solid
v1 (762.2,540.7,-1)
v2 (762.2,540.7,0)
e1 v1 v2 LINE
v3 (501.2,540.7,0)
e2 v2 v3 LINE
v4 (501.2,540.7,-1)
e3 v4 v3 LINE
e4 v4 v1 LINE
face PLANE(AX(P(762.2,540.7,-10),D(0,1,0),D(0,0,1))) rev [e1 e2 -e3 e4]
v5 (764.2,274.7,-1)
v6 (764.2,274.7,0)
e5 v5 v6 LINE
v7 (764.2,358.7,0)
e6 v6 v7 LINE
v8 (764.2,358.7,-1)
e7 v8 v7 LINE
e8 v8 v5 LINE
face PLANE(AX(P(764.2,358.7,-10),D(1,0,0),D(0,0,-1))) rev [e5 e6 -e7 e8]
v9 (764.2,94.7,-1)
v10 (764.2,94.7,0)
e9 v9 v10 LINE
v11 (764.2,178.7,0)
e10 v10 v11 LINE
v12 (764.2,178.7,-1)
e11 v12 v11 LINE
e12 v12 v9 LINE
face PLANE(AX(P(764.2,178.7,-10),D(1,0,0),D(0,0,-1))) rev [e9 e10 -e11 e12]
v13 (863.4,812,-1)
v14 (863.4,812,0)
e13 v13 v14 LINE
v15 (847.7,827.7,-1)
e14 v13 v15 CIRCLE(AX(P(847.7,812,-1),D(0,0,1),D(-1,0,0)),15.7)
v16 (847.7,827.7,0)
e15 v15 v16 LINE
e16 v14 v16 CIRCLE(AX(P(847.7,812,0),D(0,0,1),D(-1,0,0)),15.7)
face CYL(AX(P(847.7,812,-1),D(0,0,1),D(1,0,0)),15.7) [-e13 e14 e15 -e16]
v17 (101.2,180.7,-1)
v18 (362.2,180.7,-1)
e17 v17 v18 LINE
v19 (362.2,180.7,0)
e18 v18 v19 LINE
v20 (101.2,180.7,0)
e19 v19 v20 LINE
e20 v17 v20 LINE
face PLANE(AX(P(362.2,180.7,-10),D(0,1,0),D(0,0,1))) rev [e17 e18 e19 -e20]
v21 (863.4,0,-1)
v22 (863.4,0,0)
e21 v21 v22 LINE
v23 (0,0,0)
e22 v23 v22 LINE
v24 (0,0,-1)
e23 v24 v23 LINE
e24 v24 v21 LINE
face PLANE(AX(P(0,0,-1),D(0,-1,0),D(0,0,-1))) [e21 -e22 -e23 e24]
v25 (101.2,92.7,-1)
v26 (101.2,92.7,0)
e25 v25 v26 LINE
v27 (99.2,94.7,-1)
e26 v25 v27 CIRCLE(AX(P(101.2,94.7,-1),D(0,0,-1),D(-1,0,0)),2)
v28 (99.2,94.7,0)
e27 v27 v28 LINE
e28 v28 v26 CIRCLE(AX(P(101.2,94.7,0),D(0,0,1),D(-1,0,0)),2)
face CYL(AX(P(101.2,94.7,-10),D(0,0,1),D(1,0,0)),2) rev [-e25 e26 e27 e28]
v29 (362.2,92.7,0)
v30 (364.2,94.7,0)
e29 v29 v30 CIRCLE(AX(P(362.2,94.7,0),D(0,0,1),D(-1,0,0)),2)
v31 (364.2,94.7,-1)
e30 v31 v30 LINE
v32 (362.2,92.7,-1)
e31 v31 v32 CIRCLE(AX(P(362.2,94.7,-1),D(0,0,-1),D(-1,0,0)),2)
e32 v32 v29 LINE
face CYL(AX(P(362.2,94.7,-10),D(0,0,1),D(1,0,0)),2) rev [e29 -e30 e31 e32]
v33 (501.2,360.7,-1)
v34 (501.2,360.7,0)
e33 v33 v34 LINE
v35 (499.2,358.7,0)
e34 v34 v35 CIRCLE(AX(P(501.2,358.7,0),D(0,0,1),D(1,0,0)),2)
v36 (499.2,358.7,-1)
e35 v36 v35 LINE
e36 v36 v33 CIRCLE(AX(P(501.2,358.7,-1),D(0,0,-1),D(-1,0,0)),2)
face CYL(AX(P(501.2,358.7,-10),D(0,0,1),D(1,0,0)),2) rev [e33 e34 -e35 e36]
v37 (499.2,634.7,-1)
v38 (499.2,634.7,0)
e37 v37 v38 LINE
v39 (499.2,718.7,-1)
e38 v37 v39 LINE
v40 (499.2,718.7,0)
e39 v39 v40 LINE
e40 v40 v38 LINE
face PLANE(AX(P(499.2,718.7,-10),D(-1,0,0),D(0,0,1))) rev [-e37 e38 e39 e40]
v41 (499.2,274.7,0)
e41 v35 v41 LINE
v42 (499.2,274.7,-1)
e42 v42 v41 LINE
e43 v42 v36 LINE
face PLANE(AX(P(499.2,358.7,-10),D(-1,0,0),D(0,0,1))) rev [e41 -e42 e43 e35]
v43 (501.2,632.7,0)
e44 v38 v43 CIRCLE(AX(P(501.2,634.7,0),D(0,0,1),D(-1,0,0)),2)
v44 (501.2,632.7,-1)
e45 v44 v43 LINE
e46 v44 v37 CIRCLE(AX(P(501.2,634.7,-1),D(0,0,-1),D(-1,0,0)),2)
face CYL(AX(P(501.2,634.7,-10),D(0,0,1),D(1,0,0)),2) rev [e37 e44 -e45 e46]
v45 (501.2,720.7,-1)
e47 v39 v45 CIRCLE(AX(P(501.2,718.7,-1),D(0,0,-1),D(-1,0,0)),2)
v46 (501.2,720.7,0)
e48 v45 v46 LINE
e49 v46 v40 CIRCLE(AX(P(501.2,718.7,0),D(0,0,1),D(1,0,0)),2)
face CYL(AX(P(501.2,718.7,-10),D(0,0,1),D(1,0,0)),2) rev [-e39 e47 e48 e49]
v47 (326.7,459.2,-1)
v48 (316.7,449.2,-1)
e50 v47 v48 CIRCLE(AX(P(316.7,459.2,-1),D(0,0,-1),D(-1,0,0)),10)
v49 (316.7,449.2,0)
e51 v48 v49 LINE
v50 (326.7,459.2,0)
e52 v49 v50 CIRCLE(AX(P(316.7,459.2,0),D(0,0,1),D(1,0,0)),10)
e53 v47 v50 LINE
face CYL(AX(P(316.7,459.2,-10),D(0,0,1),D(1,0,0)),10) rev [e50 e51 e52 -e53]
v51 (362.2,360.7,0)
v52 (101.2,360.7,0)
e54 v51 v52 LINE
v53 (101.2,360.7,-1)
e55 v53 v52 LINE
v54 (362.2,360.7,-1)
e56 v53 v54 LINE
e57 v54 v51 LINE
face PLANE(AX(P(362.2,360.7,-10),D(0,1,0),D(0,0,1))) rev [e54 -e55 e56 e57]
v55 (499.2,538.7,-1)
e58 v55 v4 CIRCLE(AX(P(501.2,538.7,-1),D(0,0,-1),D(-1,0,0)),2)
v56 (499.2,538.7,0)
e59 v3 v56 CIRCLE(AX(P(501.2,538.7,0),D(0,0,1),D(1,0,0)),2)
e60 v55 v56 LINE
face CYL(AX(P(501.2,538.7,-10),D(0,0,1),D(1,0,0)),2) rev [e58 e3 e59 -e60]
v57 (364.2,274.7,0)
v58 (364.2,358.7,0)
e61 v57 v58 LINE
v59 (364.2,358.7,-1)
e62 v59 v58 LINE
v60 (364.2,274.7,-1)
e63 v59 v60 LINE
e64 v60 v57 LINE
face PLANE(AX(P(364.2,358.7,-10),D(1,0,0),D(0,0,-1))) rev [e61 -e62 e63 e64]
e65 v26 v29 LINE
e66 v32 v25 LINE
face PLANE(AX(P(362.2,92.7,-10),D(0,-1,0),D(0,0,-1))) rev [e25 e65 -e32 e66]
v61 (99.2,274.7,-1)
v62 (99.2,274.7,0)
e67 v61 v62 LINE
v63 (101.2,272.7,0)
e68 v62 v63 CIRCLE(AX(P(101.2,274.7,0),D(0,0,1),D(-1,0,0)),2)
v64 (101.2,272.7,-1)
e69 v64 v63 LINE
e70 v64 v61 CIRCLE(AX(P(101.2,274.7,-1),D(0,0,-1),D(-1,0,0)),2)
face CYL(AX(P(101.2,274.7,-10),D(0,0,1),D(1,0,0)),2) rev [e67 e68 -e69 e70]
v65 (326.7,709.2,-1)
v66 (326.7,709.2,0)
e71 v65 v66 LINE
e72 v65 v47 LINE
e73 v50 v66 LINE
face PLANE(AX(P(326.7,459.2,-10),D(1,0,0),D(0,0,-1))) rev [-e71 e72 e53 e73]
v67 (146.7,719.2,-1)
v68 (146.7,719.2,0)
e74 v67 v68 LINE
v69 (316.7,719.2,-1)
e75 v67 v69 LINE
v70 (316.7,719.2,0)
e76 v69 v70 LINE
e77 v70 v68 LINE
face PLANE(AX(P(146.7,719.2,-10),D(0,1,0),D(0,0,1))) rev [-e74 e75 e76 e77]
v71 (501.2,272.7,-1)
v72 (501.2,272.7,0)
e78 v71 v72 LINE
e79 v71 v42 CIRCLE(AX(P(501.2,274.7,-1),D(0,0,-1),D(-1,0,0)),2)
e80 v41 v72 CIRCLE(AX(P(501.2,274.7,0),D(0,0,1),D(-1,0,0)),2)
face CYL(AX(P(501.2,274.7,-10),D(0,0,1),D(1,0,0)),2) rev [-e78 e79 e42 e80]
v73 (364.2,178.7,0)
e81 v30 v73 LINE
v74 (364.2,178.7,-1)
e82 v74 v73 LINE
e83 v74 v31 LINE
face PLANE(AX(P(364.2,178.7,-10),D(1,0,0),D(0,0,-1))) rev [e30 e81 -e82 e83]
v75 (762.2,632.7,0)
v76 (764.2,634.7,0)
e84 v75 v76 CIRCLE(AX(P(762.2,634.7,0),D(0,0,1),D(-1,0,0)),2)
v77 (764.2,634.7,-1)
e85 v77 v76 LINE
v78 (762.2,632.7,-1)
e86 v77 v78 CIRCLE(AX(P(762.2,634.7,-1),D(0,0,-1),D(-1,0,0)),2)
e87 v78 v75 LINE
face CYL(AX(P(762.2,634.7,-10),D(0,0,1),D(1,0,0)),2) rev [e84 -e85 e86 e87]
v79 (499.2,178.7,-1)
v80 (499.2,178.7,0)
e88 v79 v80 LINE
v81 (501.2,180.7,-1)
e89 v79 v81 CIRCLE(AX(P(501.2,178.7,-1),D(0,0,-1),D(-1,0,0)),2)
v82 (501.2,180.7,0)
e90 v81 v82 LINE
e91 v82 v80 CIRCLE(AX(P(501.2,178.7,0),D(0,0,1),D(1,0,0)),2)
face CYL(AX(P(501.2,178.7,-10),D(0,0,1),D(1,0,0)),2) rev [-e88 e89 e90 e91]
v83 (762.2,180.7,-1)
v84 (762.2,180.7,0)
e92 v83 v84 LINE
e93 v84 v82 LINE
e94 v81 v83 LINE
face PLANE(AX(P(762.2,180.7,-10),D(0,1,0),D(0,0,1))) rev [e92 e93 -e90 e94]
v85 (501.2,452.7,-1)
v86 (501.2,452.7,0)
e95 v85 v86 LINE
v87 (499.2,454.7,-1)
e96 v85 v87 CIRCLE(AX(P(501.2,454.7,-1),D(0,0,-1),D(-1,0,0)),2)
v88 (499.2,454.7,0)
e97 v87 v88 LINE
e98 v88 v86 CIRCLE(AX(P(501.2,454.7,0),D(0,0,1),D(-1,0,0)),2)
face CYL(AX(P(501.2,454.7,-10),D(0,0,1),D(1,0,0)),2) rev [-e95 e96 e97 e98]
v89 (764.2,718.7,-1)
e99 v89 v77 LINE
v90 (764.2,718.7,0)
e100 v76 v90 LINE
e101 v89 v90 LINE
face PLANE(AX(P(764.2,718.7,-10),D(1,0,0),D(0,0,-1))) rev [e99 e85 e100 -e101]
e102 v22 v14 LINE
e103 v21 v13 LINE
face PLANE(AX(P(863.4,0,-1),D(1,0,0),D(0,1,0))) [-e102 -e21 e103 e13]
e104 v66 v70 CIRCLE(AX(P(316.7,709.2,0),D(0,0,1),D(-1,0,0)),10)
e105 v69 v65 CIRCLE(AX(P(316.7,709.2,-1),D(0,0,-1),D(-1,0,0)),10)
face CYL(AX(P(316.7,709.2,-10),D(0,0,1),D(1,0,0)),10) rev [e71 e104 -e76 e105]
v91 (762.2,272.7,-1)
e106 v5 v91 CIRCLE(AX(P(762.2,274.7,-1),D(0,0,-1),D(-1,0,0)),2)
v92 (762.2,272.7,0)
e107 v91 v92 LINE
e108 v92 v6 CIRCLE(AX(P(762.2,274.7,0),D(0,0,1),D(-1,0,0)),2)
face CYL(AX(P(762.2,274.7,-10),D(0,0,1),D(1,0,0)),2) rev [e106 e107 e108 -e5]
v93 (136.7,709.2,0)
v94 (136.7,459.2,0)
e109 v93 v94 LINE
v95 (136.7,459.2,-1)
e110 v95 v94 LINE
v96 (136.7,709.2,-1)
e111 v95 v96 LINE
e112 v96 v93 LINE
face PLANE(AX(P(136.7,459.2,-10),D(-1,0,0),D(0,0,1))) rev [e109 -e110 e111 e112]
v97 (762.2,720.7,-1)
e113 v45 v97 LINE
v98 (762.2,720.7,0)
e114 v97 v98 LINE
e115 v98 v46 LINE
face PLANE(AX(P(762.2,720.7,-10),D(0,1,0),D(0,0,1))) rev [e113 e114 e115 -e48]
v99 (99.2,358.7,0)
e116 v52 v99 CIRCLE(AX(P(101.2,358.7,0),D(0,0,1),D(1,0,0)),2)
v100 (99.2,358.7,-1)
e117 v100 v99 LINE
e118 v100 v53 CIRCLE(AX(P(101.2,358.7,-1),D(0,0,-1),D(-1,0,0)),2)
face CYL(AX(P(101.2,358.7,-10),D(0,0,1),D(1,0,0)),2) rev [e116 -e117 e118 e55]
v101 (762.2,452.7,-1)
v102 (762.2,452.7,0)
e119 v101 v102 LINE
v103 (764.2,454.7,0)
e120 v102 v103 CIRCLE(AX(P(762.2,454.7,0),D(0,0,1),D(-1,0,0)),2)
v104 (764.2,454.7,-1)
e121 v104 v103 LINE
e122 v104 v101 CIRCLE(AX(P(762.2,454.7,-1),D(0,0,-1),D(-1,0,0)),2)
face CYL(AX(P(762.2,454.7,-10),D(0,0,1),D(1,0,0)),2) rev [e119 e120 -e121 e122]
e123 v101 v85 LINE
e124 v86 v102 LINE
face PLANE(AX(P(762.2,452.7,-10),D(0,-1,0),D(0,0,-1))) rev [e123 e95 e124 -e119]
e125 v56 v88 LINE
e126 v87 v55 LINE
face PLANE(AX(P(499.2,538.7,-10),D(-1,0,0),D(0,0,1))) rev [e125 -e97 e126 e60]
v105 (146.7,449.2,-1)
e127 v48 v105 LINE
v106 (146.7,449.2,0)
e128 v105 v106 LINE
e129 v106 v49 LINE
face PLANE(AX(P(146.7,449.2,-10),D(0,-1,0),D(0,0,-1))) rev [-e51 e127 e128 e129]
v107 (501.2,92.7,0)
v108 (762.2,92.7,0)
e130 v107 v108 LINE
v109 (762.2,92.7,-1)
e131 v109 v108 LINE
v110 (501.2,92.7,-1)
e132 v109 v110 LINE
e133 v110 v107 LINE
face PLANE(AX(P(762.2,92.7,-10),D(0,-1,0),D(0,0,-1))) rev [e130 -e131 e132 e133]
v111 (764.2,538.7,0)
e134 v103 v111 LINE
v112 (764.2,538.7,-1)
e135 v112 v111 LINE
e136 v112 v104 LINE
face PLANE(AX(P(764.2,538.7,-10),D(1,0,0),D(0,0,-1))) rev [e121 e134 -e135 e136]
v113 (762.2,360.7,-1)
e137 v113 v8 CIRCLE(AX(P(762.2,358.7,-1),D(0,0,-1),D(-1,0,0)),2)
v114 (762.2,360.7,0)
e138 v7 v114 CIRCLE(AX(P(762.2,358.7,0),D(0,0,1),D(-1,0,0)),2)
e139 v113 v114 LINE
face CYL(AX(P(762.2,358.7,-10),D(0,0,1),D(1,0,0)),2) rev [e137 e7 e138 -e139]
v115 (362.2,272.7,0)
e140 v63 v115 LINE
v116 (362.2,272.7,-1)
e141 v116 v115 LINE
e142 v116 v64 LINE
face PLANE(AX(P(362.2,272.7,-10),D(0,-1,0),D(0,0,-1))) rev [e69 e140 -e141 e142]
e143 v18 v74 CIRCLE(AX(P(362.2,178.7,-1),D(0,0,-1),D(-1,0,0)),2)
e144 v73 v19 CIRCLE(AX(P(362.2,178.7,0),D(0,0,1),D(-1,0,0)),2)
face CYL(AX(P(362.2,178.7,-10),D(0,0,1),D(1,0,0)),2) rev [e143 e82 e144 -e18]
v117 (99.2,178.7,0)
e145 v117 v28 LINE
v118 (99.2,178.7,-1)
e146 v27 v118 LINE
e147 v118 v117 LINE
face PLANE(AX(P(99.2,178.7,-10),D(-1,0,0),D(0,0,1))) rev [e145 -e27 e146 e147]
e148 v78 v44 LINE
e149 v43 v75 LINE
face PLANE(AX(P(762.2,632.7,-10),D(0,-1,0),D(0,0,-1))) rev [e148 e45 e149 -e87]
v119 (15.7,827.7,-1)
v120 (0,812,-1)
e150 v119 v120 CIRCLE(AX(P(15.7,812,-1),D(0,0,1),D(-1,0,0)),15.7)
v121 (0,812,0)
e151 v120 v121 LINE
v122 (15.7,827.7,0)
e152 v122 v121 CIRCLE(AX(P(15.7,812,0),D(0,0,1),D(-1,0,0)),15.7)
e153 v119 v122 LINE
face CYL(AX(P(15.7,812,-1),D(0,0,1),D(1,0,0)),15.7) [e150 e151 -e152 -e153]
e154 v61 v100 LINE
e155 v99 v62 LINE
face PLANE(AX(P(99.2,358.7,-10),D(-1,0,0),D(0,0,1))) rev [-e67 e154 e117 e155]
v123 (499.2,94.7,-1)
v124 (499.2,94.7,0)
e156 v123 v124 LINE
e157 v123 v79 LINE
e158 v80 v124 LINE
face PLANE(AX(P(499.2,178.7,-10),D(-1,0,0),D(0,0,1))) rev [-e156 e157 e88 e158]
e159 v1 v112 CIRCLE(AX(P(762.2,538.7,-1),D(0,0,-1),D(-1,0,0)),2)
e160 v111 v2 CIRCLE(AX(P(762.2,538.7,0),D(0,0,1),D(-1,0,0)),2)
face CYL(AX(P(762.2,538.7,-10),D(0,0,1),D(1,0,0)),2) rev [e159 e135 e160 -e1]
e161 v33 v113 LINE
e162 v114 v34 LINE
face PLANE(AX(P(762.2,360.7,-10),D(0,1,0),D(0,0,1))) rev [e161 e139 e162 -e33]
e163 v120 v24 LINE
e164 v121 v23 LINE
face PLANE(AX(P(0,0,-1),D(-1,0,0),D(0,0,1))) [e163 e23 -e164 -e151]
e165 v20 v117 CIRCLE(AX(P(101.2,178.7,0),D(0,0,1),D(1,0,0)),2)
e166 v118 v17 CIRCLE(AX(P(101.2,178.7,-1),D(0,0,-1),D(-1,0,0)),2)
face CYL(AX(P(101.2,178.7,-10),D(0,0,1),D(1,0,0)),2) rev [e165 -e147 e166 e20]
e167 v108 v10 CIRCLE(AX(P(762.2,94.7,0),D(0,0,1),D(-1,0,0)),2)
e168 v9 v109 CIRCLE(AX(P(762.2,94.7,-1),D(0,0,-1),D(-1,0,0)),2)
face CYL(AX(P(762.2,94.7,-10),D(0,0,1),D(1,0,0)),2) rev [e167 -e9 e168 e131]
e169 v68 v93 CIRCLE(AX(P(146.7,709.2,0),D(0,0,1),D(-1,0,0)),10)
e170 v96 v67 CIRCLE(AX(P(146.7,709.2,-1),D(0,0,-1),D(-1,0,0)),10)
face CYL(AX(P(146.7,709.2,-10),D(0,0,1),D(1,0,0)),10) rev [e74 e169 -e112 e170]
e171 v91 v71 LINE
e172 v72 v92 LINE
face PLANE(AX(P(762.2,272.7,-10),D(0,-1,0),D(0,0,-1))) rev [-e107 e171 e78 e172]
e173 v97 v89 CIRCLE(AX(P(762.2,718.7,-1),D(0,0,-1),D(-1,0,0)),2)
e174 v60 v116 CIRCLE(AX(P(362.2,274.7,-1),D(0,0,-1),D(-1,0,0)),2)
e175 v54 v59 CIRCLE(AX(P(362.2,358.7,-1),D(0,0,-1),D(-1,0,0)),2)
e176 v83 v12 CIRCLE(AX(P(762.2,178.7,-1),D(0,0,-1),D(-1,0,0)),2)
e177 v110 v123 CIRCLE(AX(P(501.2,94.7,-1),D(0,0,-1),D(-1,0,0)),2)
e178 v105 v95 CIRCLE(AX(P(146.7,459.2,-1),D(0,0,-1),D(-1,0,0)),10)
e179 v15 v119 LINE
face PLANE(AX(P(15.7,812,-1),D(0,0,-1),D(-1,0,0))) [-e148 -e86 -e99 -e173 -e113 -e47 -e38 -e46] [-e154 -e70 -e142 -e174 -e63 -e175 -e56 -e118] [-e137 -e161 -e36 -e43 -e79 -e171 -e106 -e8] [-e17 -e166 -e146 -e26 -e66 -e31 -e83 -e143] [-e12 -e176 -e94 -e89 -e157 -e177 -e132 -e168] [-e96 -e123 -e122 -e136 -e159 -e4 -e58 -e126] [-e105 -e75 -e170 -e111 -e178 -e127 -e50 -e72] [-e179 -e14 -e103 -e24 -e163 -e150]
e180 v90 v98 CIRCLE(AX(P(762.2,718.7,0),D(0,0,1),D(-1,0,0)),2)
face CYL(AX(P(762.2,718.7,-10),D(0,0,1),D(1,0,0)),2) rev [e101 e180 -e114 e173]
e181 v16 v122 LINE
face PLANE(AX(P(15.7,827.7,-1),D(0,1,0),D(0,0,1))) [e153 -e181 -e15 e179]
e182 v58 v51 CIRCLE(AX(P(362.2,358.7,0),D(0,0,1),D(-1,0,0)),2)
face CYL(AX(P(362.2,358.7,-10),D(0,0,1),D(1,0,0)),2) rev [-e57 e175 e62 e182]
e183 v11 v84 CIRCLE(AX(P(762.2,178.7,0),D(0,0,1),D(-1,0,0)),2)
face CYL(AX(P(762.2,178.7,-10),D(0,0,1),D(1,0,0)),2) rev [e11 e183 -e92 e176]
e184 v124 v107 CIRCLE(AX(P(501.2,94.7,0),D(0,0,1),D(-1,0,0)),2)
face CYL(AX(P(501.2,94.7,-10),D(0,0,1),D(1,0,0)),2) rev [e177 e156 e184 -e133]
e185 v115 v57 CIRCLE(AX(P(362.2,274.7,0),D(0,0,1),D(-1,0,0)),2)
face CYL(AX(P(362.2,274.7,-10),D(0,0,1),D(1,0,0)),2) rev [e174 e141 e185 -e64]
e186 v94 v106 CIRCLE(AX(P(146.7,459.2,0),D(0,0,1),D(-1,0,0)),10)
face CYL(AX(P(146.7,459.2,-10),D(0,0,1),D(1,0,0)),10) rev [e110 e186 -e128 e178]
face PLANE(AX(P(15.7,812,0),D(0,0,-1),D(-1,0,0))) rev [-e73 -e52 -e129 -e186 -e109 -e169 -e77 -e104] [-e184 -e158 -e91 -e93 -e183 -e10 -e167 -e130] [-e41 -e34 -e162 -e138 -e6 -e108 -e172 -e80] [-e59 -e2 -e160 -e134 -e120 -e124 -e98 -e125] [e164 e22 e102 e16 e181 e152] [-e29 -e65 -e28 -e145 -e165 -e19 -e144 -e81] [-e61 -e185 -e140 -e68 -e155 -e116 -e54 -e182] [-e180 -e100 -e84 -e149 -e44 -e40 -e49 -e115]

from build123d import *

# Parameters (mm, degrees)
BASE_FLANGE1_DEPTH = 1
CUT_EXTRUDE1_DEPTH = 10
CUT_EXTRUDE2_DEPTH = 10


# Sheet-metal steps are written as plain solids
with BuildPart() as part:
    # Sketch1 → Base-Flange1 (new body)
    with BuildSketch(Plane.XY):
        with BuildLine():
            Line((0, 0), (863.4, 0))
            Line((863.4, 0), (863.4, 812))
            ThreePointArc((863.4, 812), (858.801576465, 823.101576465), (847.7, 827.7))
            Line((847.7, 827.7), (15.7, 827.7))
            ThreePointArc((15.7, 827.7), (4.598423535, 823.101576465), (0, 812))
            Line((0, 812), (0, 0))
        make_face()
    extrude(amount=-BASE_FLANGE1_DEPTH)

    # Sketch9 → Cut-Extrude1 (cut)
    with BuildSketch(Plane.XY):
        with BuildLine():
            Line((762.2, 720.7), (501.2, 720.7))
            ThreePointArc((501.2, 720.7), (499.785786438, 720.114213562), (499.2, 718.7))
            Line((499.2, 718.7), (499.2, 634.7))
            ThreePointArc((499.2, 634.7), (499.785786438, 633.285786438), (501.2, 632.7))
            Line((501.2, 632.7), (762.2, 632.7))
            ThreePointArc((762.2, 632.7), (763.614213562, 633.285786438), (764.2, 634.7))
            Line((764.2, 634.7), (764.2, 718.7))
            ThreePointArc((764.2, 718.7), (763.614213562, 720.114213562), (762.2, 720.7))
        make_face()
        with BuildLine():
            Line((764.2, 538.7), (764.2, 454.7))
            ThreePointArc((764.2, 454.7), (763.614213562, 453.285786438), (762.2, 452.7))
            Line((762.2, 452.7), (501.2, 452.7))
            ThreePointArc((501.2, 452.7), (499.785786438, 453.285786438), (499.2, 454.7))
            Line((499.2, 454.7), (499.2, 538.7))
            ThreePointArc((499.2, 538.7), (499.785786438, 540.114213562), (501.2, 540.7))
            Line((501.2, 540.7), (762.2, 540.7))
            ThreePointArc((762.2, 540.7), (763.614213562, 540.114213562), (764.2, 538.7))
        make_face()
        with BuildLine():
            Line((764.2, 358.7), (764.2, 274.7))
            ThreePointArc((764.2, 274.7), (763.614213562, 273.285786438), (762.2, 272.7))
            Line((762.2, 272.7), (501.2, 272.7))
            ThreePointArc((501.2, 272.7), (499.785786438, 273.285786438), (499.2, 274.7))
            Line((499.2, 274.7), (499.2, 358.7))
            ThreePointArc((499.2, 358.7), (499.785786438, 360.114213562), (501.2, 360.7))
            Line((501.2, 360.7), (762.2, 360.7))
            ThreePointArc((762.2, 360.7), (763.614213562, 360.114213562), (764.2, 358.7))
        make_face()
        with BuildLine():
            Line((764.2, 178.7), (764.2, 94.7))
            ThreePointArc((764.2, 94.7), (763.614213562, 93.285786438), (762.2, 92.7))
            Line((762.2, 92.7), (501.2, 92.7))
            ThreePointArc((501.2, 92.7), (499.785786438, 93.285786438), (499.2, 94.7))
            Line((499.2, 94.7), (499.2, 178.7))
            ThreePointArc((499.2, 178.7), (499.785786438, 180.114213562), (501.2, 180.7))
            Line((501.2, 180.7), (762.2, 180.7))
            ThreePointArc((762.2, 180.7), (763.614213562, 180.114213562), (764.2, 178.7))
        make_face()
        with BuildLine():
            Line((364.2, 358.7), (364.2, 274.7))
            ThreePointArc((364.2, 274.7), (363.614213562, 273.285786438), (362.2, 272.7))
            Line((362.2, 272.7), (101.2, 272.7))
            ThreePointArc((101.2, 272.7), (99.785786438, 273.285786438), (99.2, 274.7))
            Line((99.2, 274.7), (99.2, 358.7))
            ThreePointArc((99.2, 358.7), (99.785786438, 360.114213562), (101.2, 360.7))
            Line((101.2, 360.7), (362.2, 360.7))
            ThreePointArc((362.2, 360.7), (363.614213562, 360.114213562), (364.2, 358.7))
        make_face()
        with BuildLine():
            Line((364.2, 178.7), (364.2, 94.7))
            ThreePointArc((364.2, 94.7), (363.614213562, 93.285786438), (362.2, 92.7))
            Line((362.2, 92.7), (101.2, 92.7))
            ThreePointArc((101.2, 92.7), (99.785786438, 93.285786438), (99.2, 94.7))
            Line((99.2, 94.7), (99.2, 178.7))
            ThreePointArc((99.2, 178.7), (99.785786438, 180.114213562), (101.2, 180.7))
            Line((101.2, 180.7), (362.2, 180.7))
            ThreePointArc((362.2, 180.7), (363.614213562, 180.114213562), (364.2, 178.7))
        make_face()
    extrude(amount=-CUT_EXTRUDE1_DEPTH, mode=Mode.SUBTRACT)

    # Sketch10 → Cut-Extrude2 (cut)
    with BuildSketch(Plane.XY):
        with BuildLine():
            Line((146.7, 449.2), (316.7, 449.2))
            ThreePointArc((316.7, 449.2), (323.771067812, 452.128932188), (326.7, 459.2))
            Line((326.7, 459.2), (326.7, 709.2))
            ThreePointArc((326.7, 709.2), (323.771067812, 716.271067812), (316.7, 719.2))
            Line((316.7, 719.2), (146.7, 719.2))
            ThreePointArc((146.7, 719.2), (139.628932188, 716.271067812), (136.7, 709.2))
            Line((136.7, 709.2), (136.7, 459.2))
            ThreePointArc((136.7, 459.2), (139.628932188, 452.128932188), (146.7, 449.2))
        make_face()
    extrude(amount=-CUT_EXTRUDE2_DEPTH, mode=Mode.SUBTRACT)


solid = part.part
